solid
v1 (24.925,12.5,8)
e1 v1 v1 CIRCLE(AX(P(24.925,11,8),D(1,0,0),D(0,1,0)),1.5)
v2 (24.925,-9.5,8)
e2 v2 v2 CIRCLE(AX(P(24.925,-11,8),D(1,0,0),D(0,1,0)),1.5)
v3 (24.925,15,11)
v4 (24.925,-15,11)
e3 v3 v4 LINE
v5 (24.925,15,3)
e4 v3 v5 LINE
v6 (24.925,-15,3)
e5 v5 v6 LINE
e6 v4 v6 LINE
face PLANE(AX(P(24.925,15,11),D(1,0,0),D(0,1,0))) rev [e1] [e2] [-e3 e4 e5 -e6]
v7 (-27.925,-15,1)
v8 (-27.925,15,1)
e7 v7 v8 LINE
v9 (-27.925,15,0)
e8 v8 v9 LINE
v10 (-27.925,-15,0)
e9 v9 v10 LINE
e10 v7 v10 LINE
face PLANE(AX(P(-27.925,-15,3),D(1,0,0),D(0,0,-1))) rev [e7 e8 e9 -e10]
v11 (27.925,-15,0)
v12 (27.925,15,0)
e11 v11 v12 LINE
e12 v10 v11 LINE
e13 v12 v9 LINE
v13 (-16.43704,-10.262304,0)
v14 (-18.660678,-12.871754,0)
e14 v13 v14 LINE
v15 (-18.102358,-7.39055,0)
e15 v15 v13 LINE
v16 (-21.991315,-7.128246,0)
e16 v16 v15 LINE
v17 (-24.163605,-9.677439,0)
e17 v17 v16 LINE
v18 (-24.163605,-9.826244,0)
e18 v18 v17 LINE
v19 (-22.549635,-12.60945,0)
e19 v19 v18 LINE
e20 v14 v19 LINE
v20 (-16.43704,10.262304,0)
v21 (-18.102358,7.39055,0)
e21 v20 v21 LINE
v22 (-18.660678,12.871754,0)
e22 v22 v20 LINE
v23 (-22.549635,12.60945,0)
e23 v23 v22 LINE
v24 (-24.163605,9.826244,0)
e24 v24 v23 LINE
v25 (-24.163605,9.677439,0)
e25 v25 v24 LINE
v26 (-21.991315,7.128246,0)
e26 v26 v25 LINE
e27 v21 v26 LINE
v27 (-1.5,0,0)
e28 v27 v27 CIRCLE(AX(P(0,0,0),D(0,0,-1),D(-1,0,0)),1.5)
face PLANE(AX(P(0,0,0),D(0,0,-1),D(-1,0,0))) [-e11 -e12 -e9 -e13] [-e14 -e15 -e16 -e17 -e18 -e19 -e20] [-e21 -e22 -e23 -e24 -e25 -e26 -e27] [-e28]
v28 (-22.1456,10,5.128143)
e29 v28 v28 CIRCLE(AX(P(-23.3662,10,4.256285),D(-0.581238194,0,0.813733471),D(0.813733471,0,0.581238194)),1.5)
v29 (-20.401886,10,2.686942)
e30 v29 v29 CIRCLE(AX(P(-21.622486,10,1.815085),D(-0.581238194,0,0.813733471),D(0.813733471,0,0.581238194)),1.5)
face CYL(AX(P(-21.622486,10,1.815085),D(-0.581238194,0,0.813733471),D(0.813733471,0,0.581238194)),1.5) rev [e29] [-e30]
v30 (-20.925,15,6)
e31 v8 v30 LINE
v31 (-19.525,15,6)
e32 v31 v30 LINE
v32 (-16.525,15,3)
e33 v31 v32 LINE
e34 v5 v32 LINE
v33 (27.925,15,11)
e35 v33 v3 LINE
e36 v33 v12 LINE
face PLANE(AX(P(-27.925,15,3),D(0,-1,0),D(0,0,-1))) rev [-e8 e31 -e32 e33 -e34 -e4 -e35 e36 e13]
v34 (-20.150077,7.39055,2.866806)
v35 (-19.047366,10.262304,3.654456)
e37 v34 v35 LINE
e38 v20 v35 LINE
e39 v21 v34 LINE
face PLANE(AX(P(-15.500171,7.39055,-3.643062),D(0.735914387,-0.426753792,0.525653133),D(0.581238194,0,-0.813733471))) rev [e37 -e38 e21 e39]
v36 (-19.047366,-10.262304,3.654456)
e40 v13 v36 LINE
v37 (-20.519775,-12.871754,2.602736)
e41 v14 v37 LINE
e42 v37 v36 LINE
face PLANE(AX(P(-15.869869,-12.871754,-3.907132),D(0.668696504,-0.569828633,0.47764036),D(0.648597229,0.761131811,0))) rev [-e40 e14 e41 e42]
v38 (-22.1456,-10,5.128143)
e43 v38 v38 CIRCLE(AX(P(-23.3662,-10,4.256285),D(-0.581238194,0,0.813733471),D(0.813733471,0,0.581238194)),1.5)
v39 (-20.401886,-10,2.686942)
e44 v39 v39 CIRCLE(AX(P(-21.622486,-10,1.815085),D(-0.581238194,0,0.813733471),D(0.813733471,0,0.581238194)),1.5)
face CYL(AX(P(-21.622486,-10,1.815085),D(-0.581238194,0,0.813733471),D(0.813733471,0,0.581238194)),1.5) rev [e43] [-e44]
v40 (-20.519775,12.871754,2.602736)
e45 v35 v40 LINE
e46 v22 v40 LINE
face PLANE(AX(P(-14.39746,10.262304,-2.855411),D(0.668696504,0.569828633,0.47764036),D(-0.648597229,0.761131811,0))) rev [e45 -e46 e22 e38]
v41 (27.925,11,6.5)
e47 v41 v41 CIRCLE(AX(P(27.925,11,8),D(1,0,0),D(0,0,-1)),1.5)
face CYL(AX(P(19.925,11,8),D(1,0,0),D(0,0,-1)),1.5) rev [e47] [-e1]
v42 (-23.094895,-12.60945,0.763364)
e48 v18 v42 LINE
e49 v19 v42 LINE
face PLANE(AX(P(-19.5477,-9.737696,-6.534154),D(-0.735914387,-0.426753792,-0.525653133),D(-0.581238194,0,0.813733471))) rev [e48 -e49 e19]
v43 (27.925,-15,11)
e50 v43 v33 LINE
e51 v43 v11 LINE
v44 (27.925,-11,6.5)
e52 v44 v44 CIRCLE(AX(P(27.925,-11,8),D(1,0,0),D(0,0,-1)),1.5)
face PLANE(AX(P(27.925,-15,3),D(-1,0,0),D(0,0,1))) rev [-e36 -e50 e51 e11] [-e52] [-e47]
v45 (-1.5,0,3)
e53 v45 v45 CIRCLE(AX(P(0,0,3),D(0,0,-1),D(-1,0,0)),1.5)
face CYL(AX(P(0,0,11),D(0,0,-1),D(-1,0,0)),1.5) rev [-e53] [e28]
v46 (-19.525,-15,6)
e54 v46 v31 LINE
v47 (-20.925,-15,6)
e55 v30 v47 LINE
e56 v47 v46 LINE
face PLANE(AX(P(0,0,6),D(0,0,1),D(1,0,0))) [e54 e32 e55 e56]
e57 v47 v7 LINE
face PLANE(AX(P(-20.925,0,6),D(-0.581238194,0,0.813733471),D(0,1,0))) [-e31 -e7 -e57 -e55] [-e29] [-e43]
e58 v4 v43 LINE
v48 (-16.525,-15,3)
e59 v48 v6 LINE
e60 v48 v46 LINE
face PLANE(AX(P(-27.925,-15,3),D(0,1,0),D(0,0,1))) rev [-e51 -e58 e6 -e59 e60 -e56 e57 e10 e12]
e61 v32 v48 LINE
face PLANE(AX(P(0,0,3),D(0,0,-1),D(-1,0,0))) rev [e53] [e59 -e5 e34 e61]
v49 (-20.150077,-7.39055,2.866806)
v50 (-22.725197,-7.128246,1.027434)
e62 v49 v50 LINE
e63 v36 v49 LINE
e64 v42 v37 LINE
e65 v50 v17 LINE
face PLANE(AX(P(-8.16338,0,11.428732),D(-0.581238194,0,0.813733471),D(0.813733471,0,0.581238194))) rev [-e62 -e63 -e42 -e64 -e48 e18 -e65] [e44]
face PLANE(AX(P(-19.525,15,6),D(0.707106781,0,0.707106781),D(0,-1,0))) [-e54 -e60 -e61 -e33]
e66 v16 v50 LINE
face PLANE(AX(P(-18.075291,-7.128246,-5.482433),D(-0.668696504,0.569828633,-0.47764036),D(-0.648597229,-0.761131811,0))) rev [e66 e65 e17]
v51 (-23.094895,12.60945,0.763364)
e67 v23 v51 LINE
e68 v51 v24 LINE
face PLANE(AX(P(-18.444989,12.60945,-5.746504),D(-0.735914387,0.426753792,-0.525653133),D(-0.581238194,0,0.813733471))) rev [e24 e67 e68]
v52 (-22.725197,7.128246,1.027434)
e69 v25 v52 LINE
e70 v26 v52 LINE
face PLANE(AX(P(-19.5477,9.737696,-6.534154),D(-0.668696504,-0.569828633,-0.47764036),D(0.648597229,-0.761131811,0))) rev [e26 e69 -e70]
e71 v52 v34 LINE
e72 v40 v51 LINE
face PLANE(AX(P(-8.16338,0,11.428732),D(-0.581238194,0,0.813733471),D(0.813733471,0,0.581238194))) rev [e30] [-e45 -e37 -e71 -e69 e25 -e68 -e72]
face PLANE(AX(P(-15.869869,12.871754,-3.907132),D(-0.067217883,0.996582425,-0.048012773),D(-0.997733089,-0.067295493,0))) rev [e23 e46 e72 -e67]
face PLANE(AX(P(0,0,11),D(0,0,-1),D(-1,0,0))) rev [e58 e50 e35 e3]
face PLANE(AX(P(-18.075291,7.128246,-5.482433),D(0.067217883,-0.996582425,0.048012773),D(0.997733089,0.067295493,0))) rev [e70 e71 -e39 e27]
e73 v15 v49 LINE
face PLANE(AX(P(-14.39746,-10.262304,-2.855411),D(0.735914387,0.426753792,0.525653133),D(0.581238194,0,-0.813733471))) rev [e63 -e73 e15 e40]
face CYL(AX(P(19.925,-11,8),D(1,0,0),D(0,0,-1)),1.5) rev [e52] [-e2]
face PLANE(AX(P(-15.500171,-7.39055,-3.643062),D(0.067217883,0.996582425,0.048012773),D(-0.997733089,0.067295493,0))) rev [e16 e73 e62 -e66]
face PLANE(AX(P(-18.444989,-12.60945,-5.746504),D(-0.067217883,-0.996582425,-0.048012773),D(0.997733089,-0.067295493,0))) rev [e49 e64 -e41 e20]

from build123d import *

# Parameters (mm, degrees)
SKETCH1_W           = 55.85
SKETCH1_H           = 30
BOSS_EXTRUDE1_DEPTH = 3
SKETCH2_W           = 8.4
SKETCH2_H           = 30
BOSS_EXTRUDE2_DEPTH = 3
CHAMFER1_SIZE       = 5
CHAMFER1_SIZE2      = 7
SKETCH3_R           = 1.5
CUT_EXTRUDE1_DEPTH  = 3
CHAMFER2_SIZE       = 3
CUT_EXTRUDE2_START  = -3
CUT_EXTRUDE2_DEPTH  = 8
SKETCH5_W           = 3
SKETCH5_H           = 30
BOSS_EXTRUDE3_DEPTH = 8
SKETCH6_R           = 1.5
CUT_EXTRUDE3_DEPTH  = 8
SKETCH7_R           = 1.5
CUT_EXTRUDE4_DEPTH  = 34.553027062


with BuildPart() as part:
    # Sketch1 → Boss-Extrude1 (new body)
    with BuildSketch(Plane.XY):
        Rectangle(SKETCH1_W, SKETCH1_H)
    extrude(amount=BOSS_EXTRUDE1_DEPTH)

    # Sketch2 → Boss-Extrude2 (add)
    with BuildSketch(Plane.XY.offset(3)):
        with Locations((-23.725, 0)):
            Rectangle(SKETCH2_W, SKETCH2_H)
    extrude(amount=BOSS_EXTRUDE2_DEPTH)

    # Chamfer1
    chamfer1_edges = [part.edges().sort_by_distance(p)[0] for p in [
        (-27.925, 0, 6),
    ]]
    chamfer1_side = [part.faces().sort_by_distance(p)[0] for p in [
        (-27.925, 0, 3),
    ]]
    chamfer(chamfer1_edges, length=CHAMFER1_SIZE, length2=CHAMFER1_SIZE2, reference=chamfer1_side[0])

    # Sketch3 → Cut-Extrude1 (cut)
    with BuildSketch(Plane(origin=(-9.907094595, 0, 13.869932432), x_dir=(0.8137334712067354, 0, 0.5812381937190957), z_dir=(-0.5812381937190957, 0, 0.8137334712067354))):
        with Locations((-16.539943723, 10)):
            Circle(SKETCH3_R)
        with Locations((-16.539943723, -10)):
            Circle(SKETCH3_R)
    extrude(amount=-CUT_EXTRUDE1_DEPTH, mode=Mode.SUBTRACT)

    # Chamfer2
    chamfer2_edges = [part.edges().sort_by_distance(p)[0] for p in [
        (-19.525, 0, 3),
    ]]
    chamfer(chamfer2_edges, length=CHAMFER2_SIZE - 0.0001)  # a hair under: the kernel refuses the full size

    # Sketch4 → Cut-Extrude2 (cut)
    with BuildSketch(Plane(origin=(-9.907094595, 0, 13.869932432), x_dir=(0.8137334712067354, 0, 0.5812381937190959), z_dir=(-0.5812381937190958, 0, 0.8137334712067353)).offset(CUT_EXTRUDE2_START)):
        Polygon((-14.730494791, 7.39055027), (-13.3753695, 10.262303877), (-15.184818432, 12.871753607), (-18.349392655, 12.60944973), (-19.704517945, 9.737696123), (-17.895069013, 7.128246393), align=None)
        Polygon((-14.730494791, -7.39055027), (-17.895069013, -7.128246393), (-19.704517945, -9.737696123), (-18.349392655, -12.60944973), (-15.184818432, -12.871753607), (-13.3753695, -10.262303877), align=None)
    extrude(amount=-CUT_EXTRUDE2_DEPTH, mode=Mode.SUBTRACT)

    # Sketch5 → Boss-Extrude3 (add)
    with BuildSketch(Plane.XY.offset(3)):
        with Locations((26.425, 0)):
            Rectangle(SKETCH5_W, SKETCH5_H)
    extrude(amount=BOSS_EXTRUDE3_DEPTH)

    # Sketch6 → Cut-Extrude3 (cut)
    with BuildSketch(Plane(origin=(27.925, 0, 0), x_dir=(0, 0, -1), z_dir=(1, 0, 0))):
        with Locations((-8, 11)):
            Circle(SKETCH6_R)
        with Locations((-8, -11)):
            Circle(SKETCH6_R)
    extrude(amount=-CUT_EXTRUDE3_DEPTH, mode=Mode.SUBTRACT)

    # Sketch7 → Cut-Extrude4 (cut, through all)
    with BuildSketch(Plane(origin=(0, 0, 0), x_dir=(-1, 0, 0), z_dir=(0, 0, -1))):
        Circle(SKETCH7_R)
    extrude(amount=-CUT_EXTRUDE4_DEPTH, mode=Mode.SUBTRACT)


solid = part.part
